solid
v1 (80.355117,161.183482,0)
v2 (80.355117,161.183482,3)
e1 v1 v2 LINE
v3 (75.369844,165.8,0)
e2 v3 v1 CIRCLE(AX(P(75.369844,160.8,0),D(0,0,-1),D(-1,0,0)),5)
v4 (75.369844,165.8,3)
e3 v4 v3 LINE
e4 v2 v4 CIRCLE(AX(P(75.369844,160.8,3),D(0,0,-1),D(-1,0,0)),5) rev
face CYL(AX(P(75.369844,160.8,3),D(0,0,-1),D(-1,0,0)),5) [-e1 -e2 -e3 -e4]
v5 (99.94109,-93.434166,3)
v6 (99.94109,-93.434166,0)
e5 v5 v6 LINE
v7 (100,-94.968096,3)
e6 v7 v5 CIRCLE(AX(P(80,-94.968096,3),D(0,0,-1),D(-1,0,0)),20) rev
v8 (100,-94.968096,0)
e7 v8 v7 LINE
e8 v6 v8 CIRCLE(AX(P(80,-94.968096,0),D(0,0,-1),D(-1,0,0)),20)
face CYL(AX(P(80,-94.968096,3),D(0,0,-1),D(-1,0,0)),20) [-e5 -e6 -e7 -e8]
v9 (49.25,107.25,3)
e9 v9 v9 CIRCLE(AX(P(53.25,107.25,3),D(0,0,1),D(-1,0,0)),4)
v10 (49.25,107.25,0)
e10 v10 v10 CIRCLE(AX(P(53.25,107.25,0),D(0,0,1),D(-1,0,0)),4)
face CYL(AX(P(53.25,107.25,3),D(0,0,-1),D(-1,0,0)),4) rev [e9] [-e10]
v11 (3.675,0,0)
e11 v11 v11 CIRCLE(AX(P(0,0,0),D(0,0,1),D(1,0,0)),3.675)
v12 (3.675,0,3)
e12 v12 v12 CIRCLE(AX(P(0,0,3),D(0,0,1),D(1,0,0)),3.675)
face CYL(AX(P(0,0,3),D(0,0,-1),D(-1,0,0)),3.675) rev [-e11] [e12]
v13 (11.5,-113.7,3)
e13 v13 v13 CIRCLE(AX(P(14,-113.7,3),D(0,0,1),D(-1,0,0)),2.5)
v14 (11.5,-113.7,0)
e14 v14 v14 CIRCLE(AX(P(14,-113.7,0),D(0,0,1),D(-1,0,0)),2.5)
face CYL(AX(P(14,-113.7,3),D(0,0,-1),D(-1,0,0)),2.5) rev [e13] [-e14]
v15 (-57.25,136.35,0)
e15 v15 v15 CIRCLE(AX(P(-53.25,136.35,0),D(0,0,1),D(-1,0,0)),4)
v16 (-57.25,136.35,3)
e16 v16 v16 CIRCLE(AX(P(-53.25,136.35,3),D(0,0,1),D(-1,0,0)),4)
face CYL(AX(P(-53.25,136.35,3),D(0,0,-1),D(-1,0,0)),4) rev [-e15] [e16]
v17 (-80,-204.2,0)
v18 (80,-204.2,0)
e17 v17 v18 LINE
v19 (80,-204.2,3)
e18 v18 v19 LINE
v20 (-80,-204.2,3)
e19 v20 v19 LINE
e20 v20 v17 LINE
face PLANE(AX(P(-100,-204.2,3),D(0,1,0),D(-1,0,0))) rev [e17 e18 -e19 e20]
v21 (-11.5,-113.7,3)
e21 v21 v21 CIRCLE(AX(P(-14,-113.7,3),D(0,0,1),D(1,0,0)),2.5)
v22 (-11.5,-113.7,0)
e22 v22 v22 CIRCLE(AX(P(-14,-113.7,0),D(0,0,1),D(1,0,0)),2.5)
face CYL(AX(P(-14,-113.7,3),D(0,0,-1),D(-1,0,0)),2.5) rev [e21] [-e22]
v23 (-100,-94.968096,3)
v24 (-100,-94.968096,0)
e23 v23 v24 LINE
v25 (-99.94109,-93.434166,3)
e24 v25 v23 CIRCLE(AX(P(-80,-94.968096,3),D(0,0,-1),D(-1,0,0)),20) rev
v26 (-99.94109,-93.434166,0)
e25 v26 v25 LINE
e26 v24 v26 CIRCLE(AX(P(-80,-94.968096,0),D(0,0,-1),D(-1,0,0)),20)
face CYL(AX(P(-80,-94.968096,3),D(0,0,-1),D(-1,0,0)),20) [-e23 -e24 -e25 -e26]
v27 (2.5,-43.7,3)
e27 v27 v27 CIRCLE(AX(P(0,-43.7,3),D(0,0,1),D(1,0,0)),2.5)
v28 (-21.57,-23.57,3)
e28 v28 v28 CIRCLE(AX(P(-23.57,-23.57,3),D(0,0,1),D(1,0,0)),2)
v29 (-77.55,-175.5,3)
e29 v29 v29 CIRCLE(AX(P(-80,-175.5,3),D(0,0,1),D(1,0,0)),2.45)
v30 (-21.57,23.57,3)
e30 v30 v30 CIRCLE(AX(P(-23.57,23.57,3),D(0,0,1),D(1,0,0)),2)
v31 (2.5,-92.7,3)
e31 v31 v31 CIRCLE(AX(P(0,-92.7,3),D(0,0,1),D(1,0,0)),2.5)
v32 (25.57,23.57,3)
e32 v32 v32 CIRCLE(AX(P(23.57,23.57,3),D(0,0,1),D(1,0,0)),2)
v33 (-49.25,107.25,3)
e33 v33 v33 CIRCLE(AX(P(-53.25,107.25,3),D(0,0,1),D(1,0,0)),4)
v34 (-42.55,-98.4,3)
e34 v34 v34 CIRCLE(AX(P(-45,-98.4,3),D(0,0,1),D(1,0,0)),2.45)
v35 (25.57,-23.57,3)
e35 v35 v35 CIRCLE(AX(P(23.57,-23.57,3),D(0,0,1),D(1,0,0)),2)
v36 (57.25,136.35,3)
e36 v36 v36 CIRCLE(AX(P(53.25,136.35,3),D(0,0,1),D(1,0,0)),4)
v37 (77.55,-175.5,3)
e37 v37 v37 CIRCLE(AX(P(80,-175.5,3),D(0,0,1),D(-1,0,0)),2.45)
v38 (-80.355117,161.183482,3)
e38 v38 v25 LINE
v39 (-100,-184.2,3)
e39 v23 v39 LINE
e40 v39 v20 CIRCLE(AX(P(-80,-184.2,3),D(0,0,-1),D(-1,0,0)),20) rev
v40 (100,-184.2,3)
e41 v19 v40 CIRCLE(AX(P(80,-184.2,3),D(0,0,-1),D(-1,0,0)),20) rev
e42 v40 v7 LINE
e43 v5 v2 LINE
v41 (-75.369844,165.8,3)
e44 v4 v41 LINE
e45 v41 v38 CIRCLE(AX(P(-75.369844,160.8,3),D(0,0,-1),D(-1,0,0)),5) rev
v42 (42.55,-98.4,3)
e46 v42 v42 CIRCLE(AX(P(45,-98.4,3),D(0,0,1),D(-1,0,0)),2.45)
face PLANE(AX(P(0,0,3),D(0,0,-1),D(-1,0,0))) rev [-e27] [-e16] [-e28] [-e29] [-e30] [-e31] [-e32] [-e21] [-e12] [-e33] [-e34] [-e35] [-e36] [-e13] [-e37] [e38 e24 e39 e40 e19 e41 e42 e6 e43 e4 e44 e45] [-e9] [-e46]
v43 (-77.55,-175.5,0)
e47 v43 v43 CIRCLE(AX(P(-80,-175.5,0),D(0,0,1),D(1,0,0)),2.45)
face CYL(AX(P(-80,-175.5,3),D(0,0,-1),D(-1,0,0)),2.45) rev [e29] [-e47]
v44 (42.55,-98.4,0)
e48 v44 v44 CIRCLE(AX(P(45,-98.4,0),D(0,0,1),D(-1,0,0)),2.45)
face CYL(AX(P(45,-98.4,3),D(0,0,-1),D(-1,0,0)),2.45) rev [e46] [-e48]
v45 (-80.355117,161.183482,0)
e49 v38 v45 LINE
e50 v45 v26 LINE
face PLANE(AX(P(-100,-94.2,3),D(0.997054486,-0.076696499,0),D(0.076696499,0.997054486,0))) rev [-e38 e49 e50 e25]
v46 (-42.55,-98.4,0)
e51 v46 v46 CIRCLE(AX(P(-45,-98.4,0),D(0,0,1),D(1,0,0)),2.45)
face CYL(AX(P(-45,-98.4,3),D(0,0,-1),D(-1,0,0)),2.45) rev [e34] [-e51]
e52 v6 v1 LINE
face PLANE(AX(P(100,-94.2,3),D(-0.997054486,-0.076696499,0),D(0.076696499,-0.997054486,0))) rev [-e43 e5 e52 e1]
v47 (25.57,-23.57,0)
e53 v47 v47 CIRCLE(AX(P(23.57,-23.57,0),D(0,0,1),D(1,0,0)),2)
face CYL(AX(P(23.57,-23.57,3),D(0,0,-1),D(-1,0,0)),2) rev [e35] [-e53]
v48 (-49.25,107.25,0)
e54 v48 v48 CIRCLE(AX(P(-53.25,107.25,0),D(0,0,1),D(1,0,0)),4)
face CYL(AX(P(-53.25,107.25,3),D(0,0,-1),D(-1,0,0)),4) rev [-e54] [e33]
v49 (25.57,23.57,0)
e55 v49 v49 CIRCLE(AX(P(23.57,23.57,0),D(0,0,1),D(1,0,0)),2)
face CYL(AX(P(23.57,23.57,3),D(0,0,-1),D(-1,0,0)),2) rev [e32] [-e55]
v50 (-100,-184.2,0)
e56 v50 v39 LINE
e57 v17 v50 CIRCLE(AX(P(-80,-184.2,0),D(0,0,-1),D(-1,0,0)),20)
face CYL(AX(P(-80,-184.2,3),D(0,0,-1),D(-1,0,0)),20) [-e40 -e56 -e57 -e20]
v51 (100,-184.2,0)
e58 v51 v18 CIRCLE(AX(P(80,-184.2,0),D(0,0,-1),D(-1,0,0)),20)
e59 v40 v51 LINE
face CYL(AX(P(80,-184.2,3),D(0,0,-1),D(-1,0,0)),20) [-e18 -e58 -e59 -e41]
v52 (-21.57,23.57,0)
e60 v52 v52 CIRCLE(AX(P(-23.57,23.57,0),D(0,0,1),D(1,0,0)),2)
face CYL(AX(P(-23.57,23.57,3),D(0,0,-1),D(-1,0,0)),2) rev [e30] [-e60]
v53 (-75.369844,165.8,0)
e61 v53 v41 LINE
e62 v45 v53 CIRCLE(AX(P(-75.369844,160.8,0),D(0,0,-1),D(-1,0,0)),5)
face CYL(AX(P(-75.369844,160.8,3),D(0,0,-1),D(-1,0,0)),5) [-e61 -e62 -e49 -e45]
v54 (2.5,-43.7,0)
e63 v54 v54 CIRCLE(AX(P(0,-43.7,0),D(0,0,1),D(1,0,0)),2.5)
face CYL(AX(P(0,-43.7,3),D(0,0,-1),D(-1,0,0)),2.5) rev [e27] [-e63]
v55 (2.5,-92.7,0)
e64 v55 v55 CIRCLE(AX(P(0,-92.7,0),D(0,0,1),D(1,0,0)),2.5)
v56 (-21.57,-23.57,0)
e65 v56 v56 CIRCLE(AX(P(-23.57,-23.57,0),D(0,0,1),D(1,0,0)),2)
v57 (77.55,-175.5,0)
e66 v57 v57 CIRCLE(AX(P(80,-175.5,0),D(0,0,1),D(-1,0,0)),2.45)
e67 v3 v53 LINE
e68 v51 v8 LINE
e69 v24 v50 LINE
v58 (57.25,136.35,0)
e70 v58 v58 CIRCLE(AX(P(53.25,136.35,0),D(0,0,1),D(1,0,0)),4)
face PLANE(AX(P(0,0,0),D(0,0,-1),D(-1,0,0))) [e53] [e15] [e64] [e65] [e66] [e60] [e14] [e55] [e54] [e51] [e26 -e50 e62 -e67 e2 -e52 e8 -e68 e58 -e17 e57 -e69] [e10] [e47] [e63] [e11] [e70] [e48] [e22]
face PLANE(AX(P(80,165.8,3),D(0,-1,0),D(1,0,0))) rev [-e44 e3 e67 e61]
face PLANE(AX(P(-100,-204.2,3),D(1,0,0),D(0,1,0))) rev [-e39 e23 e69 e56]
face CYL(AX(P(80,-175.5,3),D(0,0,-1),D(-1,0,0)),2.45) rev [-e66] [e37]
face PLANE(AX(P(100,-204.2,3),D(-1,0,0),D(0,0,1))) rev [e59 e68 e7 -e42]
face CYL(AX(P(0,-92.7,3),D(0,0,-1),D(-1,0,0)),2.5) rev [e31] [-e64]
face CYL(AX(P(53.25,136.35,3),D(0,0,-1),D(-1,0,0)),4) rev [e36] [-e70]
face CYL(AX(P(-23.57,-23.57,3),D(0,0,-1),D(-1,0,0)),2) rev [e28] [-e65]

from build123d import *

# Parameters (mm, degrees)
CROQUIS1_R              = 2
CROQUIS1_R_2            = 3.675
CROQUIS1_R_3            = 2.5
CROQUIS1_R_4            = 2.45
CROQUIS1_R_5            = 4
SALIENTE_EXTRUIR1_DEPTH = 3
REDONDEO1_R             = 20
REDONDEO2_R             = 20
REDONDEO3_R             = 5


with BuildPart() as part:
    # Croquis1 → Saliente-Extruir1 (new body)
    with BuildSketch(Plane.XY):
        Polygon((-100, -204.2), (100, -204.2), (100, -94.2), (80, 165.8), (-80, 165.8), (-100, -94.2), align=None)
        with Locations((-23.57, 23.57)):
            Circle(CROQUIS1_R, mode=Mode.SUBTRACT)
        with Locations((23.57, 23.57)):
            Circle(CROQUIS1_R, mode=Mode.SUBTRACT)
        with Locations((-23.57, -23.57)):
            Circle(CROQUIS1_R, mode=Mode.SUBTRACT)
        with Locations((23.57, -23.57)):
            Circle(CROQUIS1_R, mode=Mode.SUBTRACT)
        Circle(CROQUIS1_R_2, mode=Mode.SUBTRACT)
        with Locations((-14, -113.7)):
            Circle(CROQUIS1_R_3, mode=Mode.SUBTRACT)
        with Locations(Location((14, -113.7, 0), (0, 0, 180))):
            Circle(CROQUIS1_R_3, mode=Mode.SUBTRACT)
        with Locations((-45, -98.4)):
            Circle(CROQUIS1_R_4, mode=Mode.SUBTRACT)
        with Locations(Location((45, -98.4, 0), (0, 0, 180))):
            Circle(CROQUIS1_R_4, mode=Mode.SUBTRACT)
        with Locations((-80, -175.5)):
            Circle(CROQUIS1_R_4, mode=Mode.SUBTRACT)
        with Locations(Location((80, -175.5, 0), (0, 0, 180))):
            Circle(CROQUIS1_R_4, mode=Mode.SUBTRACT)
        with Locations((0, -43.7)):
            Circle(CROQUIS1_R_3, mode=Mode.SUBTRACT)
        with Locations((0, -92.7)):
            Circle(CROQUIS1_R_3, mode=Mode.SUBTRACT)
        with Locations((53.25, 136.35)):
            Circle(CROQUIS1_R_5, mode=Mode.SUBTRACT)
        with Locations(Location((53.25, 107.25, 0), (0, 0, 180))):
            Circle(CROQUIS1_R_5, mode=Mode.SUBTRACT)
        with Locations((-53.25, 107.25)):
            Circle(CROQUIS1_R_5, mode=Mode.SUBTRACT)
        with Locations(Location((-53.25, 136.35, 0), (0, 0, 180))):
            Circle(CROQUIS1_R_5, mode=Mode.SUBTRACT)
    extrude(amount=SALIENTE_EXTRUIR1_DEPTH)

    # Redondeo1
    redondeo1_edges = [part.edges().sort_by_distance(p)[0] for p in [
        (100, -204.2, 1.5),
        (-100, -204.2, 1.5),
    ]]
    fillet(redondeo1_edges, radius=REDONDEO1_R)

    # Redondeo2
    # the kernel refuses this fillet: 20 mm, written as the material it takes off along each edge
    with BuildSketch(Plane(origin=(100, -94.2, -1.92024052), x_dir=(0, -1, 0), z_dir=(0, 0, 1))) as redondeo2_piece_1:
        with BuildLine():
            CenterArc((REDONDEO2_R * 0.0384048104053, -REDONDEO2_R), REDONDEO2_R, 90, 4.398705355)
            Line((-REDONDEO2_R * 0.0382916884794, -REDONDEO2_R * 0.00294551449842), (0, 0))
            Line((0, 0), (REDONDEO2_R * 0.0384048104053, 0))
        make_face()
    extrude(amount=6.840481041, mode=Mode.SUBTRACT)
    with BuildSketch(Plane(origin=(-100, -94.2, -1.92024052), x_dir=(0, -1, 0), z_dir=(0, 0, 1))) as redondeo2_piece_2:
        with BuildLine():
            CenterArc((REDONDEO2_R * 0.0384048104053, REDONDEO2_R), REDONDEO2_R, 265.601294645, 4.398705355)
            Line((-REDONDEO2_R * 0.0382916884794, REDONDEO2_R * 0.00294551449842), (0, 0))
            Line((0, 0), (REDONDEO2_R * 0.0384048104053, 0))
        make_face()
    extrude(amount=6.840481041, mode=Mode.SUBTRACT)

    # Redondeo3
    redondeo3_edges = [part.edges().sort_by_distance(p)[0] for p in [
        (80, 165.8, 1.5),
        (-80, 165.8, 1.5),
    ]]
    fillet(redondeo3_edges, radius=REDONDEO3_R)


solid = part.part
